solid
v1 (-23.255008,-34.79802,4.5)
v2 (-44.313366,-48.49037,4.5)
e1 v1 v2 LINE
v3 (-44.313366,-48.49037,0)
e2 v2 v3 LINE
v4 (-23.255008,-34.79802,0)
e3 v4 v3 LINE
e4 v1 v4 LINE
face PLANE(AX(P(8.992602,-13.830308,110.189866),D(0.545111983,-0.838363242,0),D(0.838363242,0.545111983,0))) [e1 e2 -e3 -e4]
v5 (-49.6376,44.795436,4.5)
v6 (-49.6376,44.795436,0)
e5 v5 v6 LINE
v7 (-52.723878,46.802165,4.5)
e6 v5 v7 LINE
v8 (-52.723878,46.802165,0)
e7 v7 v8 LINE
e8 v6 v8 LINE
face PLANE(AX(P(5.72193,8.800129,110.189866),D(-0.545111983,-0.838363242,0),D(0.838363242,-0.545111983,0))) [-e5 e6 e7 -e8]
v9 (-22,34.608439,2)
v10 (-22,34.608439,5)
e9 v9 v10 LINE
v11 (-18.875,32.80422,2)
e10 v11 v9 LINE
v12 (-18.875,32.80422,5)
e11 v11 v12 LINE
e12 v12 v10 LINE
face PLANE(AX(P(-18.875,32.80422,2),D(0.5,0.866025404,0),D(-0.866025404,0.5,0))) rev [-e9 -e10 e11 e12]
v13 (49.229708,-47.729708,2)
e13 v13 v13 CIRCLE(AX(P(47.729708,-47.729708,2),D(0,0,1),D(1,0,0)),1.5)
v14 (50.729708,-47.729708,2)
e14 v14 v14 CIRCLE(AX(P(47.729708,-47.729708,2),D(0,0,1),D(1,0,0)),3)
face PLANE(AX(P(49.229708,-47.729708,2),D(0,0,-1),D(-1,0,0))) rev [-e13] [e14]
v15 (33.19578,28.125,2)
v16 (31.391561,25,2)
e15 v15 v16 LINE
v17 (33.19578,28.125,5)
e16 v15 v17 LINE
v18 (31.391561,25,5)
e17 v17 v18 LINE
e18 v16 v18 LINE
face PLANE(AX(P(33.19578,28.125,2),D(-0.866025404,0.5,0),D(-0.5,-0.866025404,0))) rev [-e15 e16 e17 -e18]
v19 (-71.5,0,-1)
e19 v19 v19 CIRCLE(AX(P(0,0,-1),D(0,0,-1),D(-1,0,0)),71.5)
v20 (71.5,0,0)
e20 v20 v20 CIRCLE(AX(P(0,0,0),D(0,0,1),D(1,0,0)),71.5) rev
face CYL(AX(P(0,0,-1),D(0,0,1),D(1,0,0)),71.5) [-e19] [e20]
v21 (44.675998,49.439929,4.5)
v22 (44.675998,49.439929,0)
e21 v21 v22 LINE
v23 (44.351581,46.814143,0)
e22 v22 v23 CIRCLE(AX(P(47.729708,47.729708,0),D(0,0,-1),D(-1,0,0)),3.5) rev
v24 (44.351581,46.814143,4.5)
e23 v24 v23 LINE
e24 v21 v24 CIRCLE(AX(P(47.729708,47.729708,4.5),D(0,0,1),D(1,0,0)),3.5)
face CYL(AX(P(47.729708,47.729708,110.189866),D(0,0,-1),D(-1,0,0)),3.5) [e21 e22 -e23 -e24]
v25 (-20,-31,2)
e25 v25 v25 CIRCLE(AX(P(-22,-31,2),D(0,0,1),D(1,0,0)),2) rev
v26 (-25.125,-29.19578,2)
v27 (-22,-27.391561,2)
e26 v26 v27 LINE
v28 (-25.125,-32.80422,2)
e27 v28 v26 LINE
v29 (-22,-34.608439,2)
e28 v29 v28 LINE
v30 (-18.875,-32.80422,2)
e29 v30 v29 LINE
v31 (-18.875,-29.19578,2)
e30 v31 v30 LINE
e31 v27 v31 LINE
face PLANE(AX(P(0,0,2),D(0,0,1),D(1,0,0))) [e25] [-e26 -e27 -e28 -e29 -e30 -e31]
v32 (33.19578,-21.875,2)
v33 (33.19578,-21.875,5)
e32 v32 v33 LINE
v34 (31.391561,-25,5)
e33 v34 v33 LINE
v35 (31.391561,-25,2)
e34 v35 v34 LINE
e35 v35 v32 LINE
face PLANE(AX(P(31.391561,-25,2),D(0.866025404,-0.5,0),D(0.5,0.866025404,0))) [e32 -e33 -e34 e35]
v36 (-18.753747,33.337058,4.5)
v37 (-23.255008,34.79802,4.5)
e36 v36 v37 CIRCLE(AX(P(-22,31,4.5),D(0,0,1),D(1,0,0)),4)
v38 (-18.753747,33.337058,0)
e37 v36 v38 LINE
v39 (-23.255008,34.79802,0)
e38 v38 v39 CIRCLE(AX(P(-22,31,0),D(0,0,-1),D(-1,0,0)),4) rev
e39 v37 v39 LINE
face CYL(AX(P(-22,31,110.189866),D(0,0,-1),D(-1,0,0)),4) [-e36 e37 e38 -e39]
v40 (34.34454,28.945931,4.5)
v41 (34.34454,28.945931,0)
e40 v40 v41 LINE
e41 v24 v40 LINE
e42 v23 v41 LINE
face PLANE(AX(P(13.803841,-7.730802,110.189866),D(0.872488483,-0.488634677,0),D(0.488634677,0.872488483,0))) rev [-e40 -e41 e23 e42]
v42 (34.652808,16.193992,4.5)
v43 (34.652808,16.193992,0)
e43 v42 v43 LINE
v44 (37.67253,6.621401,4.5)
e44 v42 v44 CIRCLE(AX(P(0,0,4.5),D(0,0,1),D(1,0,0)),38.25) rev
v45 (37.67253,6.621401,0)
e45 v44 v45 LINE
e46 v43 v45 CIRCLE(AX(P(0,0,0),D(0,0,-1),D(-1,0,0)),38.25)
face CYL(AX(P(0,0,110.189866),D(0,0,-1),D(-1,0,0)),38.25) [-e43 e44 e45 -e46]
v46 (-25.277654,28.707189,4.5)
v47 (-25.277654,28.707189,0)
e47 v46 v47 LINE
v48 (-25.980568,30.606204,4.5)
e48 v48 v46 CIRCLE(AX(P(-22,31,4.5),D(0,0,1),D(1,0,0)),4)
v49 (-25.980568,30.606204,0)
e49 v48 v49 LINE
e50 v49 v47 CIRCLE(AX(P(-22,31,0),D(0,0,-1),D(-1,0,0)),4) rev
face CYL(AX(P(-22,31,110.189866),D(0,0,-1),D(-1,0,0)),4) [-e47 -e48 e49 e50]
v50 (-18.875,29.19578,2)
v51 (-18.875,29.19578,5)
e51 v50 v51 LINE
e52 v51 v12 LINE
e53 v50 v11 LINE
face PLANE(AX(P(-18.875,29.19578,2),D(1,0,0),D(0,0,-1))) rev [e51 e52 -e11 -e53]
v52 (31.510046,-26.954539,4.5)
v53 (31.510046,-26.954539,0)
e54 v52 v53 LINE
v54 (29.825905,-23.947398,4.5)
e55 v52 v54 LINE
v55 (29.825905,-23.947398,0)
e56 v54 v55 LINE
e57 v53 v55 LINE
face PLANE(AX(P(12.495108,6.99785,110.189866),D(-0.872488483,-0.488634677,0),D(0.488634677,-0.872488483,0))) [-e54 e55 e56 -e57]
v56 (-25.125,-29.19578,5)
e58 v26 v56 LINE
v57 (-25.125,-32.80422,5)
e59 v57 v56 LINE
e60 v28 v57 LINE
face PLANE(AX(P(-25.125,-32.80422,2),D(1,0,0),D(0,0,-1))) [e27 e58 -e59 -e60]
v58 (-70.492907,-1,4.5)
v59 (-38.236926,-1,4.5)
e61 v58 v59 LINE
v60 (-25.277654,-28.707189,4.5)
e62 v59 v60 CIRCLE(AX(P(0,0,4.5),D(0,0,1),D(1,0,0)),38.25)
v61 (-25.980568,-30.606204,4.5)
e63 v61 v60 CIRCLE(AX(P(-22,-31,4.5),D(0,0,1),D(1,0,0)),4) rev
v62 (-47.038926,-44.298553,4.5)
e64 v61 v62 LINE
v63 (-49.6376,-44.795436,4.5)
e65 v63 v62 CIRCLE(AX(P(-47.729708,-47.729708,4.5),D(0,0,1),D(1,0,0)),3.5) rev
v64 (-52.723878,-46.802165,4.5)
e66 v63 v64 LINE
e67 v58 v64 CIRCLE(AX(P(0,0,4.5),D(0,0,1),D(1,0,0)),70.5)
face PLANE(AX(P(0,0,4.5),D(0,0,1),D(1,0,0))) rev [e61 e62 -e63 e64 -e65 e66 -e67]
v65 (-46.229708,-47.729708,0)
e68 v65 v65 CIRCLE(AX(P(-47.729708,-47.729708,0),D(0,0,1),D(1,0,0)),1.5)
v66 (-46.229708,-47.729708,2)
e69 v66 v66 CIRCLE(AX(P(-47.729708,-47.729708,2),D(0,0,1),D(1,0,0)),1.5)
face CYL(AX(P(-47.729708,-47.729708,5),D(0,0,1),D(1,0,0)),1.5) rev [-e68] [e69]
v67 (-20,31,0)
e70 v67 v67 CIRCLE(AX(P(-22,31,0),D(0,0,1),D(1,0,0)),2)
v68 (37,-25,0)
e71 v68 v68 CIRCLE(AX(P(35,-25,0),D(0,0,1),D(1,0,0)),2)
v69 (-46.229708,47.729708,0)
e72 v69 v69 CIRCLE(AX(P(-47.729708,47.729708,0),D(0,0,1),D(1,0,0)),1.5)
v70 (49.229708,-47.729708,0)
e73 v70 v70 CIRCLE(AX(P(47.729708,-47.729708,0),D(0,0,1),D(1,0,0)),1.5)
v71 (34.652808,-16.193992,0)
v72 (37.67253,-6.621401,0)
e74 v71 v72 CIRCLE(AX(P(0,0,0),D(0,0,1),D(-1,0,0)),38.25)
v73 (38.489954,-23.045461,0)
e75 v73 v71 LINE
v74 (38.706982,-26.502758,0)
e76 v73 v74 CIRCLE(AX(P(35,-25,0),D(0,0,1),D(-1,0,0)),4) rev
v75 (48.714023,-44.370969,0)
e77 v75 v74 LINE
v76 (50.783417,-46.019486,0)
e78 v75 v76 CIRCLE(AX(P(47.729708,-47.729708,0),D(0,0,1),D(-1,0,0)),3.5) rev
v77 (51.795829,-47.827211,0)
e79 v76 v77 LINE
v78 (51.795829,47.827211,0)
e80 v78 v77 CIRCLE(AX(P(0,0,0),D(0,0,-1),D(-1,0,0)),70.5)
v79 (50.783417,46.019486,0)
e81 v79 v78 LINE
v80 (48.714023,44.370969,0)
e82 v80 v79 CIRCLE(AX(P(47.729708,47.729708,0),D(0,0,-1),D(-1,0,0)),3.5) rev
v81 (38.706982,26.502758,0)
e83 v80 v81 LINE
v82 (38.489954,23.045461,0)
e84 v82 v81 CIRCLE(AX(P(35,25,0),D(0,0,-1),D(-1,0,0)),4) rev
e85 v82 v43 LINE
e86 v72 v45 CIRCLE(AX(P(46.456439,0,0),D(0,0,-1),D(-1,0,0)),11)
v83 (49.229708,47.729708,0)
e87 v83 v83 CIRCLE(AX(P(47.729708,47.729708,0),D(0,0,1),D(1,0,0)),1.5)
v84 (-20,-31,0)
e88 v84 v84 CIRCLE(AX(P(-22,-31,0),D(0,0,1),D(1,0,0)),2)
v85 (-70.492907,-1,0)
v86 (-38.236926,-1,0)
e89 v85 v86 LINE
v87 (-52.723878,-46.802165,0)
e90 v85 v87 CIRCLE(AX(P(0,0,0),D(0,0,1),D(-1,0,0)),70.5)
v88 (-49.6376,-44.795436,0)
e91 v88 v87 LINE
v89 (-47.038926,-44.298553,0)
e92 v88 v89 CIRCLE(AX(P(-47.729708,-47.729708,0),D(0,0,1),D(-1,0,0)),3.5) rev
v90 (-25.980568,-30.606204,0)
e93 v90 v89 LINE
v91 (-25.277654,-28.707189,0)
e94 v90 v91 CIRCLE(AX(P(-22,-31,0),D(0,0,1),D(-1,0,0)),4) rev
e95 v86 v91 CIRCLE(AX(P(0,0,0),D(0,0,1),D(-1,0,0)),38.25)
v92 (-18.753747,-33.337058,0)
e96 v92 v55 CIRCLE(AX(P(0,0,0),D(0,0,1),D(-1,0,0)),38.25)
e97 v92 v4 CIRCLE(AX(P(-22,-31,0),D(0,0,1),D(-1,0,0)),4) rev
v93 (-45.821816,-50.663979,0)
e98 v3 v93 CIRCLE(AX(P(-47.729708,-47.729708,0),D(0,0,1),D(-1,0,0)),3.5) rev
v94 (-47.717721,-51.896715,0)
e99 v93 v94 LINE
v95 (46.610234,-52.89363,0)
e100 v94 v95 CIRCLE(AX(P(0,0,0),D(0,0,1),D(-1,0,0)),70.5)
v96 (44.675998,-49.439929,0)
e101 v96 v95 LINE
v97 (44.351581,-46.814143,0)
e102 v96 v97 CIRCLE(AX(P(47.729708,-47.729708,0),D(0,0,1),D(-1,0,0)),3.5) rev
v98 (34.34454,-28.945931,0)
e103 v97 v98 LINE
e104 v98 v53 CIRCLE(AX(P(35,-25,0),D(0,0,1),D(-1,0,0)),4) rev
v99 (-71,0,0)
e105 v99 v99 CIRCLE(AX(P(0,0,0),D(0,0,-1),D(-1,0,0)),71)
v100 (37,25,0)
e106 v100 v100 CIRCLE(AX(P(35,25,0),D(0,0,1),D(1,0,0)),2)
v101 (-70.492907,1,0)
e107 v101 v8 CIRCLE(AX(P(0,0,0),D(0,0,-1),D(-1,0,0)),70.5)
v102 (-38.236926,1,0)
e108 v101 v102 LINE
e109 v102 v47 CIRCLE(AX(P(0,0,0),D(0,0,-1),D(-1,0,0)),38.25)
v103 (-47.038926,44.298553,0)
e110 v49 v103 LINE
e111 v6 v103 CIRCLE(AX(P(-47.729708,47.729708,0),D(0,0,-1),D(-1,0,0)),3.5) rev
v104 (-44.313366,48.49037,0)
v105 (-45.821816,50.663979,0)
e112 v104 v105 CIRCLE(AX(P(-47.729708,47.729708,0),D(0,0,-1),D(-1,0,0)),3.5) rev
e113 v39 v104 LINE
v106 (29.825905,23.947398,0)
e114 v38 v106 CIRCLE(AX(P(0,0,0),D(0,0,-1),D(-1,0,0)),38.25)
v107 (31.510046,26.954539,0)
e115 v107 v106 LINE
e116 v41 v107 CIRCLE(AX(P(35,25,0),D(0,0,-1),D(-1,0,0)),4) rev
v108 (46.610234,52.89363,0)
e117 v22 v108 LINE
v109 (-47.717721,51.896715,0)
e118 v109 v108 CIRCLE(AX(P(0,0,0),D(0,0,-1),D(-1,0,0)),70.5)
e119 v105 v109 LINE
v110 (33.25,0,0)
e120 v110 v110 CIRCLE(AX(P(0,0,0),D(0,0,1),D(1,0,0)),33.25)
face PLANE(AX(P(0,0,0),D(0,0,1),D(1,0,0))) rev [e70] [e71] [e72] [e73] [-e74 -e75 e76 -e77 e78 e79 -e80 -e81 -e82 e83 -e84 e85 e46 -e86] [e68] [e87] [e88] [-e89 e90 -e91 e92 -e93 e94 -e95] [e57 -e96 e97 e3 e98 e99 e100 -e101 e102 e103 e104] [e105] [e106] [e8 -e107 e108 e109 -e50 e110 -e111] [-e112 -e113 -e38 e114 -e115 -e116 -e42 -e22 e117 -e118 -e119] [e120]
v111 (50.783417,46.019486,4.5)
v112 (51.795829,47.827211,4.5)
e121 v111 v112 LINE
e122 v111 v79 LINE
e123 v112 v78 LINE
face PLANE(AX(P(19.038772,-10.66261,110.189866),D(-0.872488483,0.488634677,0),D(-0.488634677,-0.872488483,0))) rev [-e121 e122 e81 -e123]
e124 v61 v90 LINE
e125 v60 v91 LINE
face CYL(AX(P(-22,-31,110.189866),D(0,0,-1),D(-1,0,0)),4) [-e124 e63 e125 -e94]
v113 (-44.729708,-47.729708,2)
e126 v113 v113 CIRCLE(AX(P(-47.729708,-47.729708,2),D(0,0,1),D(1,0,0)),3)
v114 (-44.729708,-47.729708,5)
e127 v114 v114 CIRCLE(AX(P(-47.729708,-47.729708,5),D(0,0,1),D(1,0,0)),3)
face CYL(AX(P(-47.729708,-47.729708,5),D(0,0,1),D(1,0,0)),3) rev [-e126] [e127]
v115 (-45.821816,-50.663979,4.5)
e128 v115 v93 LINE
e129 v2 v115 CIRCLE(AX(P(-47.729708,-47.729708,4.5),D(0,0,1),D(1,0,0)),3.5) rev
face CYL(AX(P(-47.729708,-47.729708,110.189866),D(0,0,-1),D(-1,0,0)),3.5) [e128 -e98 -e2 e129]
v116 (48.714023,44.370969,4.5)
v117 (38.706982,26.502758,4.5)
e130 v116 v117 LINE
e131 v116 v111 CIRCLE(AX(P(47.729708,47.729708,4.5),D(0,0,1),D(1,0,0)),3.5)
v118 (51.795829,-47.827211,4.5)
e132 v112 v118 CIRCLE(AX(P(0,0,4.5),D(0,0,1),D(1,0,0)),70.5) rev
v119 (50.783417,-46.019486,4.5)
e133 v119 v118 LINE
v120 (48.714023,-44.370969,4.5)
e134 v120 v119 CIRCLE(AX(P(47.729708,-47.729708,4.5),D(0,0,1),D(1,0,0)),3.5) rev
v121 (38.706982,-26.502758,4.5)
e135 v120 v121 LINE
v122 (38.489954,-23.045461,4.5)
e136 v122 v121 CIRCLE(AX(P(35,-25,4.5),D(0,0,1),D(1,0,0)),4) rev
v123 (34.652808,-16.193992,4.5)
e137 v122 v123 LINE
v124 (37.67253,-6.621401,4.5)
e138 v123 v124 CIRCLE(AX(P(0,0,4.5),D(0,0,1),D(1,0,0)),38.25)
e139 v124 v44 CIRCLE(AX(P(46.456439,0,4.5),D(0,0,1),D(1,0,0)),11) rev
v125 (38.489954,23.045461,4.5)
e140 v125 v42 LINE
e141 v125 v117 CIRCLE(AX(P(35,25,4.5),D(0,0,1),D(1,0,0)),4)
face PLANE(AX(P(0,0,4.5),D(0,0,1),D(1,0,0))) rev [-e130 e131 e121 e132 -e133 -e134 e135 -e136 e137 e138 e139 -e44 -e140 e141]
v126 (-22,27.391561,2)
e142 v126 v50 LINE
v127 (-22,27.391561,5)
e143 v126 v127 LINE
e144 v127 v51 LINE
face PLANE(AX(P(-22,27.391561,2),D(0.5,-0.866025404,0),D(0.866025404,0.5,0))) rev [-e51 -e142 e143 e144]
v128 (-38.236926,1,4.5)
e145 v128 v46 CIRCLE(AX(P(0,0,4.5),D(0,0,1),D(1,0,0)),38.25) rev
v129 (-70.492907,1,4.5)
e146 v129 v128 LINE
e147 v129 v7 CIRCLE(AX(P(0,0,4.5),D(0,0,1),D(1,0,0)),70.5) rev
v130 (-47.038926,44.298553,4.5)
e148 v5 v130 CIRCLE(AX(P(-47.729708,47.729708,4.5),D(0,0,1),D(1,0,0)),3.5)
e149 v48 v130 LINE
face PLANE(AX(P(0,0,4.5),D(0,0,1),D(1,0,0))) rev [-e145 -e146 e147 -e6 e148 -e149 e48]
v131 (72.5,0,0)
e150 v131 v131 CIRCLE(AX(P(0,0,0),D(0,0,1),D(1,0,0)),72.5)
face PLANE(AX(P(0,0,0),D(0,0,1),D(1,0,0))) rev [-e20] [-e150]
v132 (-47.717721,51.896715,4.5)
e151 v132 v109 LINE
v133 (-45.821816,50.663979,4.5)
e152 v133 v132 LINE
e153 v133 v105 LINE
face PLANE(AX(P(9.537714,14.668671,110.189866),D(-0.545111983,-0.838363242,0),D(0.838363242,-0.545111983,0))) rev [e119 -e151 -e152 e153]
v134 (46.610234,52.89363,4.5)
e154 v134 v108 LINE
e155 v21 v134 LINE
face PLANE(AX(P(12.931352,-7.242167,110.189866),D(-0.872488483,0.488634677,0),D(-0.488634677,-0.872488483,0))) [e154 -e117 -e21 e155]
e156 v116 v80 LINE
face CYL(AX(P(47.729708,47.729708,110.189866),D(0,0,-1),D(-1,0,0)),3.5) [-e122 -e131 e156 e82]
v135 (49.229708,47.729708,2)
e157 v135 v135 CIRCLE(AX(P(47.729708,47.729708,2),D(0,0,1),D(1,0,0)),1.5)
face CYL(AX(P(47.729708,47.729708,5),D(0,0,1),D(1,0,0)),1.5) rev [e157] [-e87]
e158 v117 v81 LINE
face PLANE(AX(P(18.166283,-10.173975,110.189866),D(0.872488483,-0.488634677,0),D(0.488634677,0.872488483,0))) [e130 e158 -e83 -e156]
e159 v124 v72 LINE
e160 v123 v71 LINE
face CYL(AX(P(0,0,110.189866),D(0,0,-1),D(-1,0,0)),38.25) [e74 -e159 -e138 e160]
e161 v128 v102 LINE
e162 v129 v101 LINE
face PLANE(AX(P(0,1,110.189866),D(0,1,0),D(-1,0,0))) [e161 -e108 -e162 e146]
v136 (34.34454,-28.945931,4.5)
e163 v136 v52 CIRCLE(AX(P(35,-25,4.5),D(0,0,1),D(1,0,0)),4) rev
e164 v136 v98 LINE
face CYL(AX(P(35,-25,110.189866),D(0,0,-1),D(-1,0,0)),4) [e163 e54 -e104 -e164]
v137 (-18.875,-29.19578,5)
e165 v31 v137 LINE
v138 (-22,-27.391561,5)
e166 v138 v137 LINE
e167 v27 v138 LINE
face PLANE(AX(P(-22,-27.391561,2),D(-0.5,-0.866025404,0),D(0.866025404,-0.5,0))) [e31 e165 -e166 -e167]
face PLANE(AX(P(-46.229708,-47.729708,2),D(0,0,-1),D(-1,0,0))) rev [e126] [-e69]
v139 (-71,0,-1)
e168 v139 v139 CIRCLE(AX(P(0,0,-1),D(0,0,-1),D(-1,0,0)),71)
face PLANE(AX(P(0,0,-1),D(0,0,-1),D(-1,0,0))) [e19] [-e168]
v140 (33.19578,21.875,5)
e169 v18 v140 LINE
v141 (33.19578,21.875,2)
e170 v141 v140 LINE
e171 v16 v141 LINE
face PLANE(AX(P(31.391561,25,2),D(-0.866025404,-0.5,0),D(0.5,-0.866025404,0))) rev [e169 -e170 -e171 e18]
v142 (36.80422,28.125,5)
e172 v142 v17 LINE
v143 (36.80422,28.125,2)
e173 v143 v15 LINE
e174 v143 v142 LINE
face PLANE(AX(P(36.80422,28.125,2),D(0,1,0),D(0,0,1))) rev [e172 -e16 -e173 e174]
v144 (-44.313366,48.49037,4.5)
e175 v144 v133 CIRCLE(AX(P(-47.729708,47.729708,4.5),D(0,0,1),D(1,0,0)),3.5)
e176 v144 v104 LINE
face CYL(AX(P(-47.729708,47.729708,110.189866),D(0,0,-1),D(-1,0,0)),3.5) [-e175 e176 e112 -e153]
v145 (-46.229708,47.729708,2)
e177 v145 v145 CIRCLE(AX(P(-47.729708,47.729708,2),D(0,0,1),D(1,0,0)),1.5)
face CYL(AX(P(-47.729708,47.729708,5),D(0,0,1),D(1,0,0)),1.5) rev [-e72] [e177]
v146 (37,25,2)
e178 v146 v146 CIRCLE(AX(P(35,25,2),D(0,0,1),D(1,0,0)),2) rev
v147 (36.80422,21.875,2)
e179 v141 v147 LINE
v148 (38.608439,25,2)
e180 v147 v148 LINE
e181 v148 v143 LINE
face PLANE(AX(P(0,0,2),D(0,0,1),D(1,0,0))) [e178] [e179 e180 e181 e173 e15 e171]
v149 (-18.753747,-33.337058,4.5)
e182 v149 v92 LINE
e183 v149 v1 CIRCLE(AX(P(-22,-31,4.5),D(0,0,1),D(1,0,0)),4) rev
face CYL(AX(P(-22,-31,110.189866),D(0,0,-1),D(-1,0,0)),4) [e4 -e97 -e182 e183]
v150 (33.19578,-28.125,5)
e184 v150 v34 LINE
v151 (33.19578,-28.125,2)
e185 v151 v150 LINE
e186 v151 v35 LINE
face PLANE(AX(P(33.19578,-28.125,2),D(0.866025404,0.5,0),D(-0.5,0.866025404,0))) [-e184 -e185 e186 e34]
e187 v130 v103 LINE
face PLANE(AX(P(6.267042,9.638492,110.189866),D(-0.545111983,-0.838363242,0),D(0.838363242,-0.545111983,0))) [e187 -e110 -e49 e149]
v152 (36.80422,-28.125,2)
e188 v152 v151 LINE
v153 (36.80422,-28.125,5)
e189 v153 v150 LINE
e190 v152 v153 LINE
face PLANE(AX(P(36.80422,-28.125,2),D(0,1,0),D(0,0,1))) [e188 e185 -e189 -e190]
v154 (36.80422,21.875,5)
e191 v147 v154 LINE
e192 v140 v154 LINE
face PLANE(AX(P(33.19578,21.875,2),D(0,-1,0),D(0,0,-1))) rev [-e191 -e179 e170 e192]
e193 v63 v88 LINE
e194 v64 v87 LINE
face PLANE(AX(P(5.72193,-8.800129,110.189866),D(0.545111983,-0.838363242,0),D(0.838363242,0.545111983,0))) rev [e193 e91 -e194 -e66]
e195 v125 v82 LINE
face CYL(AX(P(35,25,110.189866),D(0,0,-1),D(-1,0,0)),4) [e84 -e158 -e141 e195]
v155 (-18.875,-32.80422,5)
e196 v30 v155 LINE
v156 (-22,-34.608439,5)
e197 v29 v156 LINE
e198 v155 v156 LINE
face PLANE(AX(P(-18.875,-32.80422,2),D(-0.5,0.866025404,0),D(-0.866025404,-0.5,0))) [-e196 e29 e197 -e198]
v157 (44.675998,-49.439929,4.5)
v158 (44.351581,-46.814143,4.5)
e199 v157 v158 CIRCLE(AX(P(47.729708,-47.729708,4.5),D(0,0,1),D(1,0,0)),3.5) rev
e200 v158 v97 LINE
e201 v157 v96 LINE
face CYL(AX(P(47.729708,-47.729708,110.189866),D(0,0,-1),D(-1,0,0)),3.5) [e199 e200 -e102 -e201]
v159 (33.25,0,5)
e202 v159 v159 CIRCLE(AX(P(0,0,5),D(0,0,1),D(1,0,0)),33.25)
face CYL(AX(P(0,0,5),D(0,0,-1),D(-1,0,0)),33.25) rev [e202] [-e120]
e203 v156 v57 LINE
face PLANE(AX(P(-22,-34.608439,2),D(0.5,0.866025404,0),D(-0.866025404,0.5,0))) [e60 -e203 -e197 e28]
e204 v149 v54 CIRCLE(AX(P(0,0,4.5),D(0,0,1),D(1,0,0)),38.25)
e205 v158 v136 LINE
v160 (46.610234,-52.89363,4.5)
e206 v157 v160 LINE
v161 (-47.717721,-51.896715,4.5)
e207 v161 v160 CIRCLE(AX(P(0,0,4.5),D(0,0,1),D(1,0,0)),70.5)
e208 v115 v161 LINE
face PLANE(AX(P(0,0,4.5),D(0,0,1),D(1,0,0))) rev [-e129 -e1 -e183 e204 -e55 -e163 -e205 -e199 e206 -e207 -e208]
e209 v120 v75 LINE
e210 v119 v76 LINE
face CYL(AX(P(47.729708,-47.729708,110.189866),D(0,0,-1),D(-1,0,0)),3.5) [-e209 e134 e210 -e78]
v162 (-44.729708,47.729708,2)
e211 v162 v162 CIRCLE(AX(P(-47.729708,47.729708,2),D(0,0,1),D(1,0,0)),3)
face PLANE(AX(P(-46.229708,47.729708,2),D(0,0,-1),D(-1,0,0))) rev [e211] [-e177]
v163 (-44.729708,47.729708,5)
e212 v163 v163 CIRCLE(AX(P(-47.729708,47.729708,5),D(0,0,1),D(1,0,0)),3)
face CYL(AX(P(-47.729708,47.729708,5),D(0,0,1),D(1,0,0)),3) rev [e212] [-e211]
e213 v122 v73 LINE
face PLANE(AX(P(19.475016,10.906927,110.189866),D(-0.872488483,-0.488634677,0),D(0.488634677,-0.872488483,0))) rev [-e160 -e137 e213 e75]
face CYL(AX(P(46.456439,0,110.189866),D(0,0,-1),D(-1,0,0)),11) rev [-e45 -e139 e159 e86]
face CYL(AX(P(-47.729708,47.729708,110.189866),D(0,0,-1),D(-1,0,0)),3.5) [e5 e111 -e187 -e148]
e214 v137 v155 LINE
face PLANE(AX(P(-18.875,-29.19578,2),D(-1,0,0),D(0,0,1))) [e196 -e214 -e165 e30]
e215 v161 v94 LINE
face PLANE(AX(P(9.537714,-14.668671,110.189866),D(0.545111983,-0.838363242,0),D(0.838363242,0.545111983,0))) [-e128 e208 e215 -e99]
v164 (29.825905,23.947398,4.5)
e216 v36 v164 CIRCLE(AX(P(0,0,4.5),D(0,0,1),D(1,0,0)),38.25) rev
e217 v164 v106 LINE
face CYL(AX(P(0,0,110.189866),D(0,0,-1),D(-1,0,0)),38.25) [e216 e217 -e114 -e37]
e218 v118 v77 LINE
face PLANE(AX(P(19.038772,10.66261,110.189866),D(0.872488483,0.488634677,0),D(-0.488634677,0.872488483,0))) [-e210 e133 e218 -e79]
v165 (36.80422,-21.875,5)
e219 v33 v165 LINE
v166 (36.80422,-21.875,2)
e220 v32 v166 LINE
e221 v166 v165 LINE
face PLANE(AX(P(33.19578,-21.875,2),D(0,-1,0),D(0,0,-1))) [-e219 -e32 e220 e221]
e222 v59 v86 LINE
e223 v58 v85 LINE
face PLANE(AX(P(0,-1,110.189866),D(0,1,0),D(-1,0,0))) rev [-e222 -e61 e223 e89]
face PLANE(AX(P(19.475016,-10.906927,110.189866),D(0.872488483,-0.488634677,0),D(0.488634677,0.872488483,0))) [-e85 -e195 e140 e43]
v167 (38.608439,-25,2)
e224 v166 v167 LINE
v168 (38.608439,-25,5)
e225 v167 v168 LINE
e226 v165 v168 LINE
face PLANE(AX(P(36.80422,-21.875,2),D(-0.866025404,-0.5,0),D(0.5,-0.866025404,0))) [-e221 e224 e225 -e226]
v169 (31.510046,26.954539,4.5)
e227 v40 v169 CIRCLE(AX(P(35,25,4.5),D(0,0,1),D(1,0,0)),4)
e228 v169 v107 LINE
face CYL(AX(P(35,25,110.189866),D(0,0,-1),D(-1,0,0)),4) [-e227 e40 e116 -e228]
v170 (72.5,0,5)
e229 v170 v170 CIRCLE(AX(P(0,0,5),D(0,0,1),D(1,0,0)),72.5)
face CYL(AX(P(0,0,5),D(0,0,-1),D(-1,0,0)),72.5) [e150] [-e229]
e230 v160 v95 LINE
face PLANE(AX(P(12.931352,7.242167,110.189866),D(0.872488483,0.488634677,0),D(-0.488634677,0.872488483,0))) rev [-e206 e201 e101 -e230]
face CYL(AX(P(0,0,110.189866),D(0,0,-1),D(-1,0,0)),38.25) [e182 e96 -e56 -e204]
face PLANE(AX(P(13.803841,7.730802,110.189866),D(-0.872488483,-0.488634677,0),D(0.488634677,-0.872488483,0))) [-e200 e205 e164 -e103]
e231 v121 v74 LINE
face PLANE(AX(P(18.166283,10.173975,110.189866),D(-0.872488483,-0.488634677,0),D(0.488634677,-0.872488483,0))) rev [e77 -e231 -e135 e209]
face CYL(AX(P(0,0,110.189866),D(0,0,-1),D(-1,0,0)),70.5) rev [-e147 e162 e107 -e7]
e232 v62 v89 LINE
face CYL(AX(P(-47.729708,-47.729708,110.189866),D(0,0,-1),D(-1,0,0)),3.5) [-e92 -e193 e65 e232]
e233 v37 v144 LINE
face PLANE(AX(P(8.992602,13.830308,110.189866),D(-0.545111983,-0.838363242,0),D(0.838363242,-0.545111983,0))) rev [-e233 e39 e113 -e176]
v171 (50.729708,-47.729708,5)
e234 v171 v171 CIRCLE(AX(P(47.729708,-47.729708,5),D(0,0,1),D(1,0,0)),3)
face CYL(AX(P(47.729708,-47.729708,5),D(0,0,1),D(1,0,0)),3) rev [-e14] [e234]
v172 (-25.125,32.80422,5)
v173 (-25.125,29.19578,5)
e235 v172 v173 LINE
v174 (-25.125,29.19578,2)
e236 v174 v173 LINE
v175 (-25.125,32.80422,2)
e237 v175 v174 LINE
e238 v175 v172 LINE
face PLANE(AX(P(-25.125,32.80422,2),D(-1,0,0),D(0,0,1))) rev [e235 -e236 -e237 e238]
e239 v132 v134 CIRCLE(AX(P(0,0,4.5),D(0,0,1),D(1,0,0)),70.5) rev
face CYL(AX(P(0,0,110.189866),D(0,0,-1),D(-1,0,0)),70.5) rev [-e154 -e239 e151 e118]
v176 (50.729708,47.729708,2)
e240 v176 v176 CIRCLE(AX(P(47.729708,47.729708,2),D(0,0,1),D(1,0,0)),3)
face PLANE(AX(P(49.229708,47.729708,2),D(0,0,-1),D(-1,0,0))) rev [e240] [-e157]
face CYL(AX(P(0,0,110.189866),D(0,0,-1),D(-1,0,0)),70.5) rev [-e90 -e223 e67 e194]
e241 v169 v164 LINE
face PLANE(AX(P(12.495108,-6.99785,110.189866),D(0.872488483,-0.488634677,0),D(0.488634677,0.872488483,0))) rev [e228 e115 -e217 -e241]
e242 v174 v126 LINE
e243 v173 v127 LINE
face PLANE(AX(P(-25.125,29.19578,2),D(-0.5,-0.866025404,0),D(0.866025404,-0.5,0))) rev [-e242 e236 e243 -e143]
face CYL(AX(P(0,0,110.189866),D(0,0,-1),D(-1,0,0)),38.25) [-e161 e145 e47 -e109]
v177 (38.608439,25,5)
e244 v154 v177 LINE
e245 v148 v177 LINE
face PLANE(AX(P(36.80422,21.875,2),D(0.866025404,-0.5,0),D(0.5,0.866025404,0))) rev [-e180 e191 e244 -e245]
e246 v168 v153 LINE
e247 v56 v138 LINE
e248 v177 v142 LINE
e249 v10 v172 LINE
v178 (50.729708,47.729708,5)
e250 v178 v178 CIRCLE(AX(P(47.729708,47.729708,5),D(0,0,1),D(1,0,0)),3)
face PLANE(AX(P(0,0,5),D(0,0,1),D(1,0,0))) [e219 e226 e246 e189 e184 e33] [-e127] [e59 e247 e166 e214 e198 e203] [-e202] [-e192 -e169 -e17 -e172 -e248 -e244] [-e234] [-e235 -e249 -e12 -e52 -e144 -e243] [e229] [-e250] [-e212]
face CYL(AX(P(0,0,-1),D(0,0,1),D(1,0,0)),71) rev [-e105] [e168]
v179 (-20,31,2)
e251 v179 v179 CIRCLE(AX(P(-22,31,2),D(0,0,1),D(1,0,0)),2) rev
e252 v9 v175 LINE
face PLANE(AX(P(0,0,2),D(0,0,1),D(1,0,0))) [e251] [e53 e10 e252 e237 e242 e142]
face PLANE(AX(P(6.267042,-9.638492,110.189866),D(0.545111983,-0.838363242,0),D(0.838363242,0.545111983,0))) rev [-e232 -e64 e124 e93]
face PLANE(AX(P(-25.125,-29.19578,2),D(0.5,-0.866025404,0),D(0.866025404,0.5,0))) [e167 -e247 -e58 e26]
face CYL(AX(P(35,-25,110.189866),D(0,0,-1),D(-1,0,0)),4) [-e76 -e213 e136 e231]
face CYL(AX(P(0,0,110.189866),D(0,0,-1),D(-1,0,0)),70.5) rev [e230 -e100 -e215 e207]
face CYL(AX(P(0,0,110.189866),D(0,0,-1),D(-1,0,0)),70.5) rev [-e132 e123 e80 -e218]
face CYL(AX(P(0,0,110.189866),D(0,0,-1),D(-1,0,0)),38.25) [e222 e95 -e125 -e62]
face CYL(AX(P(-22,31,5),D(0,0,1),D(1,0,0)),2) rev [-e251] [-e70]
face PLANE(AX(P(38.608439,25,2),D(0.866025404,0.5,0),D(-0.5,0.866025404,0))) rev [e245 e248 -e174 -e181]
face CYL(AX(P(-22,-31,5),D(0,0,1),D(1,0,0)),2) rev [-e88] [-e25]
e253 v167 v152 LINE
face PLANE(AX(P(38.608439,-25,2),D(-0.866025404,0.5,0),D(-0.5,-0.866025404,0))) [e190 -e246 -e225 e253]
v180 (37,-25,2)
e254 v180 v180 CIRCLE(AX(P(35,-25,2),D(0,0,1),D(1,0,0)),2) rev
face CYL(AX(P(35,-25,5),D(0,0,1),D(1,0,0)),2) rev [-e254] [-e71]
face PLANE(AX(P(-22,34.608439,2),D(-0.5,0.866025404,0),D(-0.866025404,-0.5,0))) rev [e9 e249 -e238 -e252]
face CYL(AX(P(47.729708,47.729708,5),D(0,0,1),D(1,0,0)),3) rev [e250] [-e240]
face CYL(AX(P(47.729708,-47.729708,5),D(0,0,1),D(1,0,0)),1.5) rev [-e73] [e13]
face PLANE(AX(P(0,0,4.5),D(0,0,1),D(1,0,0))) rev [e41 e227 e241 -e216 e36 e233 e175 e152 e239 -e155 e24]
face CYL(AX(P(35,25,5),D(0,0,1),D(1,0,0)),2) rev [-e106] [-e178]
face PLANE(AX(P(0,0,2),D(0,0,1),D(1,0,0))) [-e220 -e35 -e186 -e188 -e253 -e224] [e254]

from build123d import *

# Parameters (mm, degrees)
SKIZZE1_R                 = 72.5
SKIZZE1_R_2               = 33.25
LIDAR_TOP_BASE_DEPTH      = 5
LIDAR_SCREWS_D            = 4
SPACER_SCREWS_D           = 3
SPACER_SCREWS_CBORE_D     = 6
SPACER_SCREWS_CBORE_DEPTH = 3
BOTTOM_START              = -4.5
BOTTOM_STRUCTURE_DEPTH    = 4.5
HEX_NUT_DEPTH             = 3
SKIZZE7_R                 = 71.5
SKIZZE7_R_2               = 71
COVER_RING_DEPTH          = 1


with BuildPart() as part:
    # Skizze1 → Lidar Top Base (new body)
    with BuildSketch(Plane.XY):
        Circle(SKIZZE1_R)
        Circle(SKIZZE1_R_2, mode=Mode.SUBTRACT)
    extrude(amount=LIDAR_TOP_BASE_DEPTH)

    # Lidar Screws (through all)
    with Locations(Plane.XY.offset(5)):
        with Locations((-22, 31), (35, 25), (35, -25), (-22, -31)):
            Hole(LIDAR_SCREWS_D / 2)

    # Spacer Screws (through all)
    with Locations(Plane(origin=(0, 0, 5), x_dir=(-1, 0, 0), z_dir=(0, 0, 1))):
        with Locations((47.72970773, -47.72970773), (47.72970773, 47.72970773), (-47.72970773, 47.72970773), (-47.72970773, -47.72970773)):
            CounterBoreHole(SPACER_SCREWS_D / 2, SPACER_SCREWS_CBORE_D / 2, SPACER_SCREWS_CBORE_DEPTH)

    # Skizze6 → Bottom Structure (cut)
    with BuildSketch(Plane(origin=(0, 0, 0), x_dir=(-1, 0, 0), z_dir=(0, 0, -1)).offset(BOTTOM_START)):
        with BuildLine():
            ThreePointArc((-44.67599804, 49.439929098), (-44.256119002, 48.158871274), (-44.351580895, 46.814142832))
            Line((-44.351580895, 46.814142832), (-34.344540081, 28.945931106))
            ThreePointArc((-34.344540081, 28.945931106), (-32.700538124, 28.272991763), (-31.510046068, 26.954538706))
            Line((-31.510046068, 26.954538706), (-29.825905448, 23.947397859))
            ThreePointArc((-29.825905448, 23.947397859), (-7.258760505, 37.554931713), (18.753747138, 33.337058483))
            ThreePointArc((18.753747138, 33.337058483), (20.765145539, 34.804620146), (23.255008426, 34.798019728))
            Line((23.255008426, 34.798019728), (44.31336561, 48.490369623))
            ThreePointArc((44.31336561, 48.490369623), (44.854292699, 49.725199749), (45.821815788, 50.663979077))
            Line((45.821815788, 50.663979077), (47.717721333, 51.896715414))
            ThreePointArc((47.717721333, 51.896715414), (0.745045066, 70.496063066), (-46.61023353, 52.893630338))
            Line((-46.61023353, 52.893630338), (-44.67599804, 49.439929098))
        make_face()
        with BuildLine():
            Line((-38.706982496, 26.502757723), (-48.714023309, 44.370969449))
            ThreePointArc((-48.714023309, 44.370969449), (-49.910490622, 44.992156639), (-50.78341742, 46.019486362))
            Line((-50.78341742, 46.019486362), (-51.795828593, 47.827211296))
            ThreePointArc((-51.795828593, 47.827211296), (-65.657657268, 25.677267029), (-70.5, 0))
            Line((-70.5, 0), (-57.456439237, 0))
            ThreePointArc((-57.456439237, 0), (-42.965235741, -10.431275001), (-37.672530483, 6.621400682))
            ThreePointArc((-37.672530483, 6.621400682), (-36.478038354, 11.507181142), (-34.652808242, 16.193992125))
            Line((-34.652808242, 16.193992125), (-38.489953932, 23.045461294))
            ThreePointArc((-38.489953932, 23.045461294), (-38.992142049, 24.749397), (-38.706982496, 26.502757723))
        make_face()
        with BuildLine():
            ThreePointArc((49.637599672, 44.795436383), (48.387022114, 44.291984966), (47.038925526, 44.298553413))
            Line((47.038925526, 44.298553413), (25.980568343, 30.606203517))
            ThreePointArc((25.980568343, 30.606203517), (25.751268172, 29.611480247), (25.277654247, 28.707188922))
            ThreePointArc((25.277654247, 28.707188922), (34.647475396, 16.205398751), (38.23692587, 1))
            Line((38.23692587, 1), (70.492907445, 1))
            ThreePointArc((70.492907445, 1), (65.727115081, 25.498947882), (52.72387838, 46.802164998))
            Line((52.72387838, 46.802164998), (49.637599672, 44.795436383))
        make_face()
    bottom_structure = extrude(amount=BOTTOM_STRUCTURE_DEPTH, mode=Mode.SUBTRACT)

    # Skizze9 → Hex Nut (cut)
    with BuildSketch(Plane.XY.offset(5)):
        Polygon((-18.875, 32.804219591), (-22, 34.608439182), (-25.125, 32.804219591), (-25.125, 29.195780409), (-22, 27.391560818), (-18.875, 29.195780409), align=None)
        Polygon((38.608439182, 25), (36.804219591, 28.125), (33.195780409, 28.125), (31.391560818, 25), (33.195780409, 21.875), (36.804219591, 21.875), align=None)
    hex_nut = extrude(amount=-HEX_NUT_DEPTH, mode=Mode.SUBTRACT)

    # Structure Mirror: Bottom Structure, Hex Nut across plane
    add(bottom_structure.mirror(Plane.ZX), mode=Mode.SUBTRACT)
    add(hex_nut.mirror(Plane.ZX), mode=Mode.SUBTRACT)

    # Skizze7 → Cover Ring (add)
    with BuildSketch(Plane(origin=(0, 0, 0), x_dir=(-1, 0, 0), z_dir=(0, 0, -1))):
        with Locations(Location((0, 0, 0), (0, 0, 180))):
            Circle(SKIZZE7_R)
        Circle(SKIZZE7_R_2, mode=Mode.SUBTRACT)
    extrude(amount=COVER_RING_DEPTH)


solid = part.part
